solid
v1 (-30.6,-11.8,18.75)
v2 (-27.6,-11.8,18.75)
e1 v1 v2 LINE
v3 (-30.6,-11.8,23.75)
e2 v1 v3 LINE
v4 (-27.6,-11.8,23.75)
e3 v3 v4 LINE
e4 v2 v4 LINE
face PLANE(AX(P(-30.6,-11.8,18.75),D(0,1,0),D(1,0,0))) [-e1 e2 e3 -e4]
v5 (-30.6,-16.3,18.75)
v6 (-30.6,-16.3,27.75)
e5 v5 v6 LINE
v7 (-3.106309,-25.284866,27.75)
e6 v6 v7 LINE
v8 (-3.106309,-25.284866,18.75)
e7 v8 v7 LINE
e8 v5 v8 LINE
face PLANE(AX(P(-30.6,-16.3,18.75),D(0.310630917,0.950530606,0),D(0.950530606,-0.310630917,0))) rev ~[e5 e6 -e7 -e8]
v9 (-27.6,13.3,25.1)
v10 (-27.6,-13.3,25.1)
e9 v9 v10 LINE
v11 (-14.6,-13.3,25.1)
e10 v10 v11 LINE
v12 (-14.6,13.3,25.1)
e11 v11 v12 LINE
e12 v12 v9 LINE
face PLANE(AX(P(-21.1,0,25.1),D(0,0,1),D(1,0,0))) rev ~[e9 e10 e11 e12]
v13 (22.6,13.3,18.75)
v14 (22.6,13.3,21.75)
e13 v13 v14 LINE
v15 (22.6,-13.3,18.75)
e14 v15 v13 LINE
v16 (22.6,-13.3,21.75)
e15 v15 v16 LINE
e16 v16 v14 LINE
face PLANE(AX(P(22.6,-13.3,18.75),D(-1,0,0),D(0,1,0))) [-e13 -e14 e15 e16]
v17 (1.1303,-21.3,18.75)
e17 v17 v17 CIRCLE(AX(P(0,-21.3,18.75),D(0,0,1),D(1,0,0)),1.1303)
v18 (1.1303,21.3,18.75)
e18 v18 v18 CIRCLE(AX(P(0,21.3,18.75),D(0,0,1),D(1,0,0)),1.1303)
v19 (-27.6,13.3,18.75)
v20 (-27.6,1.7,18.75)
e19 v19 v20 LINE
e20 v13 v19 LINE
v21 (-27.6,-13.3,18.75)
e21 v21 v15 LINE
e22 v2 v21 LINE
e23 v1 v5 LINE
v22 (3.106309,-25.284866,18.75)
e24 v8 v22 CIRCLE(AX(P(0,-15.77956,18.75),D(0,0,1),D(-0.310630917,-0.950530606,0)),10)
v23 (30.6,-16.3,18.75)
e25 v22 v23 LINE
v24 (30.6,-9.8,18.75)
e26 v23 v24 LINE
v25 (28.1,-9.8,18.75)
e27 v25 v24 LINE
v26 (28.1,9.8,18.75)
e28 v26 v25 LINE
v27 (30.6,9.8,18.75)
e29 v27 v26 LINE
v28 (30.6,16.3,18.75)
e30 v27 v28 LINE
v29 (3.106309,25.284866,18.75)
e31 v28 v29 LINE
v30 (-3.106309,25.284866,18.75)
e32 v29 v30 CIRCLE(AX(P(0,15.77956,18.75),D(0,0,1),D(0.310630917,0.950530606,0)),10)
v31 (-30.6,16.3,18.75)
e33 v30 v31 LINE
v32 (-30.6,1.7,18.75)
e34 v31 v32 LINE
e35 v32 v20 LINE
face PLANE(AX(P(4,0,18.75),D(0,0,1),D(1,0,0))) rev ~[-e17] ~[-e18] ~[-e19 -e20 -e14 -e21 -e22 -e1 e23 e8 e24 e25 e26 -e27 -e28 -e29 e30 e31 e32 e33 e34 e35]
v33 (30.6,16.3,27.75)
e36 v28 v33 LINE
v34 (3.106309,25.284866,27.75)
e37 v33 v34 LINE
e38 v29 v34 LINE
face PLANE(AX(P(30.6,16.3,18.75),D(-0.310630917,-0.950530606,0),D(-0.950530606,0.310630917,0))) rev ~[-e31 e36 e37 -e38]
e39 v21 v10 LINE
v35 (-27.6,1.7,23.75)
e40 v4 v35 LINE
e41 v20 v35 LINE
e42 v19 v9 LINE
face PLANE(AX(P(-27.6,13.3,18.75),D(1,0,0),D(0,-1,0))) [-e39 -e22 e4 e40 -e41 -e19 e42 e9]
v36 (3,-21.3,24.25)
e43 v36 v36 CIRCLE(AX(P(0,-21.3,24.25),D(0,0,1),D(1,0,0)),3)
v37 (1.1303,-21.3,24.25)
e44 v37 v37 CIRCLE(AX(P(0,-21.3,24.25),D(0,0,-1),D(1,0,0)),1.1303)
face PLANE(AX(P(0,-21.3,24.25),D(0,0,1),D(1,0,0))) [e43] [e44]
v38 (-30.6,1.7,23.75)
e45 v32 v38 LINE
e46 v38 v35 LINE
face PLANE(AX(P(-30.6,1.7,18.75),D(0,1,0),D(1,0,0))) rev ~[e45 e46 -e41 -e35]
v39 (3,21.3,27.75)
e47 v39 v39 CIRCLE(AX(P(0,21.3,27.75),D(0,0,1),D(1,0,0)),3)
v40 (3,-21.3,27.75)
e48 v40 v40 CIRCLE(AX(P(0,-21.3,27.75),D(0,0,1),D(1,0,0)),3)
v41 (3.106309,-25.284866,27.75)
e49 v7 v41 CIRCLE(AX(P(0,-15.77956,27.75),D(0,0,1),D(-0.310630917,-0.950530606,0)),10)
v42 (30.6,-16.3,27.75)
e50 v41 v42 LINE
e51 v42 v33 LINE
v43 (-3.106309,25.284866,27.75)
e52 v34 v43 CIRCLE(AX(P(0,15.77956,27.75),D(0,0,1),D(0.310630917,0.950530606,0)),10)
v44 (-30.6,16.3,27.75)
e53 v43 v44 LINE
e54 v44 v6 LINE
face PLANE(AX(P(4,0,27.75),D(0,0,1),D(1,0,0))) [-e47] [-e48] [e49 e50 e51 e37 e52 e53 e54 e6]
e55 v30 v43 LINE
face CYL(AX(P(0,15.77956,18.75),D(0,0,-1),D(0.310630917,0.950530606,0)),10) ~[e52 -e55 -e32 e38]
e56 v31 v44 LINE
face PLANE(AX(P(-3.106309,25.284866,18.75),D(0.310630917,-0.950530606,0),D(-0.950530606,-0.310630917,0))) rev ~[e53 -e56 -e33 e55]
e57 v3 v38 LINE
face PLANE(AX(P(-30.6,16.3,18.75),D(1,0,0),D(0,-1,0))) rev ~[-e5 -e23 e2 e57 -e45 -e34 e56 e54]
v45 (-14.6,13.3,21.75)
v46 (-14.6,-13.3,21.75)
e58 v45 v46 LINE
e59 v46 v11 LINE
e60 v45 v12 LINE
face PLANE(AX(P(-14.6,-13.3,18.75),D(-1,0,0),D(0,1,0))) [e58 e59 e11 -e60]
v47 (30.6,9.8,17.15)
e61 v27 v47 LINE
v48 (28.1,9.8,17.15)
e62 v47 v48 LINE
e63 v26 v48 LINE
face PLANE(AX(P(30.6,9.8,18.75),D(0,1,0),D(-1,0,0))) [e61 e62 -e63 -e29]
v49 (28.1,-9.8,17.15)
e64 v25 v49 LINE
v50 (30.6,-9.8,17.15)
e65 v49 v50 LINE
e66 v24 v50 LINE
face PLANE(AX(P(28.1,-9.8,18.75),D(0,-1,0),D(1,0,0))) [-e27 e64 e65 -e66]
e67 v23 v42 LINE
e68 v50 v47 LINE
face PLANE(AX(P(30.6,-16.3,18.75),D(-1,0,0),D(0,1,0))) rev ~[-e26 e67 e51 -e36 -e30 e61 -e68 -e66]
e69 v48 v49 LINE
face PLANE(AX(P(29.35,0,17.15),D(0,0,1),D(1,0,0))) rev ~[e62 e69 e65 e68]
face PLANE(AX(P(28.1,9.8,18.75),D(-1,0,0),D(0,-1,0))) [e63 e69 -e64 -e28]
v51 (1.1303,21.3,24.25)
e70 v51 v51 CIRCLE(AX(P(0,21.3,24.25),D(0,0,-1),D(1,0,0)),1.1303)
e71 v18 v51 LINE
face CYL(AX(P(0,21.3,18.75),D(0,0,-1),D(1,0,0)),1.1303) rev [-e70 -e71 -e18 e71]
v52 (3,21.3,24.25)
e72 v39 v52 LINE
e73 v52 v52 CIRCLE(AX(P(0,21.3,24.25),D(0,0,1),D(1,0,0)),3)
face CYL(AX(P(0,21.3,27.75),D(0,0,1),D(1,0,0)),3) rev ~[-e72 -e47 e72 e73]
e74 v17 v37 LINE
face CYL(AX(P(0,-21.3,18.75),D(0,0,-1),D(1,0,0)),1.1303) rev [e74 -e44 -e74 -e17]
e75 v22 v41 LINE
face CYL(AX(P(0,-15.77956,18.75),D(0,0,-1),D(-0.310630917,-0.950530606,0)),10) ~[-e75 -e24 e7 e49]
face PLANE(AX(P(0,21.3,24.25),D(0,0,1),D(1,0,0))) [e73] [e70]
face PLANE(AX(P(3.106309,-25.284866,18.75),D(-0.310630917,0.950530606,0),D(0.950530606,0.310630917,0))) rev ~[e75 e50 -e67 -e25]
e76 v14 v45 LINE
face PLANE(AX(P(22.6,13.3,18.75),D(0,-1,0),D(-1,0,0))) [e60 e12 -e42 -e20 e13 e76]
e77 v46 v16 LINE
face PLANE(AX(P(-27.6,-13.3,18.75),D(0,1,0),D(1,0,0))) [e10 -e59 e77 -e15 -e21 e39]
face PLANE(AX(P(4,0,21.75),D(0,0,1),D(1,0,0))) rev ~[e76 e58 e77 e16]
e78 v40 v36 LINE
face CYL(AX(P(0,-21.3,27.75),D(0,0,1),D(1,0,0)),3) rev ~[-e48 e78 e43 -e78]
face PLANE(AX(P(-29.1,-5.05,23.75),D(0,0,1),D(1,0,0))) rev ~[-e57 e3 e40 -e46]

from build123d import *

# Parameters (mm, degrees)
F2_DEPTH = 1.6
F1_R     = 3
F1_W     = 3
F1_H     = 13.5
F1_H_2   = 11.6
F1_R_2   = 1.1303
F1_H_3   = 1.5
F3_DEPTH = 9
F4_DEPTH = 3
F5_DEPTH = 5
F6_DEPTH = 6.35
F7_R     = 3
F8_DEPTH = 3.5


with BuildPart() as f2:
    # F1 (on offset) → F2 (new body)
    with BuildSketch(Plane.XY.offset(18.75)):
        Polygon((28.1, -9.8), (30.6, -9.8), (30.6, 9.8), (28.1, 9.8), (28.1, 0), align=None)
    extrude(amount=-F2_DEPTH)

    # F1 (on offset) → F3 (join)
    with BuildSketch(Plane.XY.offset(18.75)):
        Polygon((-14.6, -13.3), (22.6, -13.3), (22.6, -10.3), (22.6, 10.3), (22.6, 13.3), (-14.6, 13.3), align=None)
        Polygon((-27.6, -13.3), (-14.6, -13.3), (-14.6, 13.3), (-27.6, 13.3), (-27.6, 1.7), (-27.6, -11.8), align=None)
        with BuildLine():
            Line((3.1063091707, -25.2848662841), (30.6, -16.3))
            Line((30.6, -16.3), (-30.6, -16.3))
            Line((-30.6, -16.3), (-3.1063091707, -25.2848662841))
            ThreePointArc((-3.1063091707, -25.2848662841), (0, -25.7795602219), (3.1063091707, -25.2848662841))
        make_face()
        with Locations((0, -21.3)):
            Circle(F1_R, mode=Mode.SUBTRACT)
        with BuildLine():
            Line((-30.6, 16.3), (30.6, 16.3))
            Line((30.6, 16.3), (3.1063091707, 25.2848662841))
            ThreePointArc((3.1063091707, 25.2848662841), (0, 25.7795602219), (-3.1063091707, 25.2848662841))
            Line((-3.1063091707, 25.2848662841), (-30.6, 16.3))
        make_face()
        with Locations((0, 21.3)):
            Circle(F1_R, mode=Mode.SUBTRACT)
        Polygon((27.6, -10.3), (27.6, -13.3), (22.6, -13.3), (-14.6, -13.3), (-27.6, -13.3), (-30.6, -13.3), (-30.6, -16.3), (30.6, -16.3), (30.6, -10.3), align=None)
        Polygon((27.6, 13.3), (27.6, 10.3), (30.6, 10.3), (30.6, 16.3), (-30.6, 16.3), (-30.6, 13.3), (-27.6, 13.3), (-14.6, 13.3), (22.6, 13.3), align=None)
        Polygon((22.6, -13.3), (27.6, -13.3), (27.6, -10.3), (27.6, 10.3), (27.6, 13.3), (22.6, 13.3), (22.6, 10.3), (22.6, -10.3), align=None)
        Polygon((28.1, -9.8), (30.6, -9.8), (30.6, 9.8), (28.1, 9.8), (28.1, 0), align=None)
        with Locations((-29.1, -5.05)):
            Rectangle(F1_W, F1_H)
        with Locations((-29.1, 7.5)):
            Rectangle(F1_W, F1_H_2)
        with Locations((0, 21.3)):
            Circle(F1_R)
        with Locations((0, 21.3)):
            Circle(F1_R_2, mode=Mode.SUBTRACT)
        with Locations((0, -21.3)):
            Circle(F1_R)
        with Locations((0, -21.3)):
            Circle(F1_R_2, mode=Mode.SUBTRACT)
        Polygon((27.6, 10.3), (27.6, -10.3), (30.6, -10.3), (30.6, -9.8), (28.1, -9.8), (28.1, 0), (28.1, 9.8), (30.6, 9.8), (30.6, 10.3), align=None)
        with Locations((-29.1, -12.55)):
            Rectangle(F1_W, F1_H_3)
        with Locations((0, -21.3)):
            Circle(F1_R_2)
    extrude(amount=F3_DEPTH)

    # F1 (on offset) → F4 (cut)
    with BuildSketch(Plane.XY.offset(18.75)):
        Polygon((-14.6, -13.3), (22.6, -13.3), (22.6, -10.3), (22.6, 10.3), (22.6, 13.3), (-14.6, 13.3), align=None)
        with Locations((0, -21.3)):
            Circle(F1_R_2)
    extrude(amount=F4_DEPTH, mode=Mode.SUBTRACT)

    # F1 (on offset) → F5 (cut)
    with BuildSketch(Plane.XY.offset(18.75)):
        with Locations((-29.1, -5.05)):
            Rectangle(F1_W, F1_H)
        with Locations((0, -21.3)):
            Circle(F1_R_2)
    extrude(amount=F5_DEPTH, mode=Mode.SUBTRACT)

    # F1 (on offset) → F6 (cut)
    with BuildSketch(Plane.XY.offset(18.75)):
        Polygon((-27.6, -13.3), (-14.6, -13.3), (-14.6, 13.3), (-27.6, 13.3), (-27.6, 1.7), (-27.6, -11.8), align=None)
        with Locations((0, -21.3)):
            Circle(F1_R_2)
    extrude(amount=F6_DEPTH, mode=Mode.SUBTRACT)

    # F7 (on face) → F8 (cut)
    with BuildSketch(Plane.XY.offset(27.75)):
        with Locations((0, 21.3)):
            Circle(F7_R)
        with Locations((0, -21.3)):
            Circle(F7_R)
    extrude(amount=-F8_DEPTH, mode=Mode.SUBTRACT)


solid = f2.part
